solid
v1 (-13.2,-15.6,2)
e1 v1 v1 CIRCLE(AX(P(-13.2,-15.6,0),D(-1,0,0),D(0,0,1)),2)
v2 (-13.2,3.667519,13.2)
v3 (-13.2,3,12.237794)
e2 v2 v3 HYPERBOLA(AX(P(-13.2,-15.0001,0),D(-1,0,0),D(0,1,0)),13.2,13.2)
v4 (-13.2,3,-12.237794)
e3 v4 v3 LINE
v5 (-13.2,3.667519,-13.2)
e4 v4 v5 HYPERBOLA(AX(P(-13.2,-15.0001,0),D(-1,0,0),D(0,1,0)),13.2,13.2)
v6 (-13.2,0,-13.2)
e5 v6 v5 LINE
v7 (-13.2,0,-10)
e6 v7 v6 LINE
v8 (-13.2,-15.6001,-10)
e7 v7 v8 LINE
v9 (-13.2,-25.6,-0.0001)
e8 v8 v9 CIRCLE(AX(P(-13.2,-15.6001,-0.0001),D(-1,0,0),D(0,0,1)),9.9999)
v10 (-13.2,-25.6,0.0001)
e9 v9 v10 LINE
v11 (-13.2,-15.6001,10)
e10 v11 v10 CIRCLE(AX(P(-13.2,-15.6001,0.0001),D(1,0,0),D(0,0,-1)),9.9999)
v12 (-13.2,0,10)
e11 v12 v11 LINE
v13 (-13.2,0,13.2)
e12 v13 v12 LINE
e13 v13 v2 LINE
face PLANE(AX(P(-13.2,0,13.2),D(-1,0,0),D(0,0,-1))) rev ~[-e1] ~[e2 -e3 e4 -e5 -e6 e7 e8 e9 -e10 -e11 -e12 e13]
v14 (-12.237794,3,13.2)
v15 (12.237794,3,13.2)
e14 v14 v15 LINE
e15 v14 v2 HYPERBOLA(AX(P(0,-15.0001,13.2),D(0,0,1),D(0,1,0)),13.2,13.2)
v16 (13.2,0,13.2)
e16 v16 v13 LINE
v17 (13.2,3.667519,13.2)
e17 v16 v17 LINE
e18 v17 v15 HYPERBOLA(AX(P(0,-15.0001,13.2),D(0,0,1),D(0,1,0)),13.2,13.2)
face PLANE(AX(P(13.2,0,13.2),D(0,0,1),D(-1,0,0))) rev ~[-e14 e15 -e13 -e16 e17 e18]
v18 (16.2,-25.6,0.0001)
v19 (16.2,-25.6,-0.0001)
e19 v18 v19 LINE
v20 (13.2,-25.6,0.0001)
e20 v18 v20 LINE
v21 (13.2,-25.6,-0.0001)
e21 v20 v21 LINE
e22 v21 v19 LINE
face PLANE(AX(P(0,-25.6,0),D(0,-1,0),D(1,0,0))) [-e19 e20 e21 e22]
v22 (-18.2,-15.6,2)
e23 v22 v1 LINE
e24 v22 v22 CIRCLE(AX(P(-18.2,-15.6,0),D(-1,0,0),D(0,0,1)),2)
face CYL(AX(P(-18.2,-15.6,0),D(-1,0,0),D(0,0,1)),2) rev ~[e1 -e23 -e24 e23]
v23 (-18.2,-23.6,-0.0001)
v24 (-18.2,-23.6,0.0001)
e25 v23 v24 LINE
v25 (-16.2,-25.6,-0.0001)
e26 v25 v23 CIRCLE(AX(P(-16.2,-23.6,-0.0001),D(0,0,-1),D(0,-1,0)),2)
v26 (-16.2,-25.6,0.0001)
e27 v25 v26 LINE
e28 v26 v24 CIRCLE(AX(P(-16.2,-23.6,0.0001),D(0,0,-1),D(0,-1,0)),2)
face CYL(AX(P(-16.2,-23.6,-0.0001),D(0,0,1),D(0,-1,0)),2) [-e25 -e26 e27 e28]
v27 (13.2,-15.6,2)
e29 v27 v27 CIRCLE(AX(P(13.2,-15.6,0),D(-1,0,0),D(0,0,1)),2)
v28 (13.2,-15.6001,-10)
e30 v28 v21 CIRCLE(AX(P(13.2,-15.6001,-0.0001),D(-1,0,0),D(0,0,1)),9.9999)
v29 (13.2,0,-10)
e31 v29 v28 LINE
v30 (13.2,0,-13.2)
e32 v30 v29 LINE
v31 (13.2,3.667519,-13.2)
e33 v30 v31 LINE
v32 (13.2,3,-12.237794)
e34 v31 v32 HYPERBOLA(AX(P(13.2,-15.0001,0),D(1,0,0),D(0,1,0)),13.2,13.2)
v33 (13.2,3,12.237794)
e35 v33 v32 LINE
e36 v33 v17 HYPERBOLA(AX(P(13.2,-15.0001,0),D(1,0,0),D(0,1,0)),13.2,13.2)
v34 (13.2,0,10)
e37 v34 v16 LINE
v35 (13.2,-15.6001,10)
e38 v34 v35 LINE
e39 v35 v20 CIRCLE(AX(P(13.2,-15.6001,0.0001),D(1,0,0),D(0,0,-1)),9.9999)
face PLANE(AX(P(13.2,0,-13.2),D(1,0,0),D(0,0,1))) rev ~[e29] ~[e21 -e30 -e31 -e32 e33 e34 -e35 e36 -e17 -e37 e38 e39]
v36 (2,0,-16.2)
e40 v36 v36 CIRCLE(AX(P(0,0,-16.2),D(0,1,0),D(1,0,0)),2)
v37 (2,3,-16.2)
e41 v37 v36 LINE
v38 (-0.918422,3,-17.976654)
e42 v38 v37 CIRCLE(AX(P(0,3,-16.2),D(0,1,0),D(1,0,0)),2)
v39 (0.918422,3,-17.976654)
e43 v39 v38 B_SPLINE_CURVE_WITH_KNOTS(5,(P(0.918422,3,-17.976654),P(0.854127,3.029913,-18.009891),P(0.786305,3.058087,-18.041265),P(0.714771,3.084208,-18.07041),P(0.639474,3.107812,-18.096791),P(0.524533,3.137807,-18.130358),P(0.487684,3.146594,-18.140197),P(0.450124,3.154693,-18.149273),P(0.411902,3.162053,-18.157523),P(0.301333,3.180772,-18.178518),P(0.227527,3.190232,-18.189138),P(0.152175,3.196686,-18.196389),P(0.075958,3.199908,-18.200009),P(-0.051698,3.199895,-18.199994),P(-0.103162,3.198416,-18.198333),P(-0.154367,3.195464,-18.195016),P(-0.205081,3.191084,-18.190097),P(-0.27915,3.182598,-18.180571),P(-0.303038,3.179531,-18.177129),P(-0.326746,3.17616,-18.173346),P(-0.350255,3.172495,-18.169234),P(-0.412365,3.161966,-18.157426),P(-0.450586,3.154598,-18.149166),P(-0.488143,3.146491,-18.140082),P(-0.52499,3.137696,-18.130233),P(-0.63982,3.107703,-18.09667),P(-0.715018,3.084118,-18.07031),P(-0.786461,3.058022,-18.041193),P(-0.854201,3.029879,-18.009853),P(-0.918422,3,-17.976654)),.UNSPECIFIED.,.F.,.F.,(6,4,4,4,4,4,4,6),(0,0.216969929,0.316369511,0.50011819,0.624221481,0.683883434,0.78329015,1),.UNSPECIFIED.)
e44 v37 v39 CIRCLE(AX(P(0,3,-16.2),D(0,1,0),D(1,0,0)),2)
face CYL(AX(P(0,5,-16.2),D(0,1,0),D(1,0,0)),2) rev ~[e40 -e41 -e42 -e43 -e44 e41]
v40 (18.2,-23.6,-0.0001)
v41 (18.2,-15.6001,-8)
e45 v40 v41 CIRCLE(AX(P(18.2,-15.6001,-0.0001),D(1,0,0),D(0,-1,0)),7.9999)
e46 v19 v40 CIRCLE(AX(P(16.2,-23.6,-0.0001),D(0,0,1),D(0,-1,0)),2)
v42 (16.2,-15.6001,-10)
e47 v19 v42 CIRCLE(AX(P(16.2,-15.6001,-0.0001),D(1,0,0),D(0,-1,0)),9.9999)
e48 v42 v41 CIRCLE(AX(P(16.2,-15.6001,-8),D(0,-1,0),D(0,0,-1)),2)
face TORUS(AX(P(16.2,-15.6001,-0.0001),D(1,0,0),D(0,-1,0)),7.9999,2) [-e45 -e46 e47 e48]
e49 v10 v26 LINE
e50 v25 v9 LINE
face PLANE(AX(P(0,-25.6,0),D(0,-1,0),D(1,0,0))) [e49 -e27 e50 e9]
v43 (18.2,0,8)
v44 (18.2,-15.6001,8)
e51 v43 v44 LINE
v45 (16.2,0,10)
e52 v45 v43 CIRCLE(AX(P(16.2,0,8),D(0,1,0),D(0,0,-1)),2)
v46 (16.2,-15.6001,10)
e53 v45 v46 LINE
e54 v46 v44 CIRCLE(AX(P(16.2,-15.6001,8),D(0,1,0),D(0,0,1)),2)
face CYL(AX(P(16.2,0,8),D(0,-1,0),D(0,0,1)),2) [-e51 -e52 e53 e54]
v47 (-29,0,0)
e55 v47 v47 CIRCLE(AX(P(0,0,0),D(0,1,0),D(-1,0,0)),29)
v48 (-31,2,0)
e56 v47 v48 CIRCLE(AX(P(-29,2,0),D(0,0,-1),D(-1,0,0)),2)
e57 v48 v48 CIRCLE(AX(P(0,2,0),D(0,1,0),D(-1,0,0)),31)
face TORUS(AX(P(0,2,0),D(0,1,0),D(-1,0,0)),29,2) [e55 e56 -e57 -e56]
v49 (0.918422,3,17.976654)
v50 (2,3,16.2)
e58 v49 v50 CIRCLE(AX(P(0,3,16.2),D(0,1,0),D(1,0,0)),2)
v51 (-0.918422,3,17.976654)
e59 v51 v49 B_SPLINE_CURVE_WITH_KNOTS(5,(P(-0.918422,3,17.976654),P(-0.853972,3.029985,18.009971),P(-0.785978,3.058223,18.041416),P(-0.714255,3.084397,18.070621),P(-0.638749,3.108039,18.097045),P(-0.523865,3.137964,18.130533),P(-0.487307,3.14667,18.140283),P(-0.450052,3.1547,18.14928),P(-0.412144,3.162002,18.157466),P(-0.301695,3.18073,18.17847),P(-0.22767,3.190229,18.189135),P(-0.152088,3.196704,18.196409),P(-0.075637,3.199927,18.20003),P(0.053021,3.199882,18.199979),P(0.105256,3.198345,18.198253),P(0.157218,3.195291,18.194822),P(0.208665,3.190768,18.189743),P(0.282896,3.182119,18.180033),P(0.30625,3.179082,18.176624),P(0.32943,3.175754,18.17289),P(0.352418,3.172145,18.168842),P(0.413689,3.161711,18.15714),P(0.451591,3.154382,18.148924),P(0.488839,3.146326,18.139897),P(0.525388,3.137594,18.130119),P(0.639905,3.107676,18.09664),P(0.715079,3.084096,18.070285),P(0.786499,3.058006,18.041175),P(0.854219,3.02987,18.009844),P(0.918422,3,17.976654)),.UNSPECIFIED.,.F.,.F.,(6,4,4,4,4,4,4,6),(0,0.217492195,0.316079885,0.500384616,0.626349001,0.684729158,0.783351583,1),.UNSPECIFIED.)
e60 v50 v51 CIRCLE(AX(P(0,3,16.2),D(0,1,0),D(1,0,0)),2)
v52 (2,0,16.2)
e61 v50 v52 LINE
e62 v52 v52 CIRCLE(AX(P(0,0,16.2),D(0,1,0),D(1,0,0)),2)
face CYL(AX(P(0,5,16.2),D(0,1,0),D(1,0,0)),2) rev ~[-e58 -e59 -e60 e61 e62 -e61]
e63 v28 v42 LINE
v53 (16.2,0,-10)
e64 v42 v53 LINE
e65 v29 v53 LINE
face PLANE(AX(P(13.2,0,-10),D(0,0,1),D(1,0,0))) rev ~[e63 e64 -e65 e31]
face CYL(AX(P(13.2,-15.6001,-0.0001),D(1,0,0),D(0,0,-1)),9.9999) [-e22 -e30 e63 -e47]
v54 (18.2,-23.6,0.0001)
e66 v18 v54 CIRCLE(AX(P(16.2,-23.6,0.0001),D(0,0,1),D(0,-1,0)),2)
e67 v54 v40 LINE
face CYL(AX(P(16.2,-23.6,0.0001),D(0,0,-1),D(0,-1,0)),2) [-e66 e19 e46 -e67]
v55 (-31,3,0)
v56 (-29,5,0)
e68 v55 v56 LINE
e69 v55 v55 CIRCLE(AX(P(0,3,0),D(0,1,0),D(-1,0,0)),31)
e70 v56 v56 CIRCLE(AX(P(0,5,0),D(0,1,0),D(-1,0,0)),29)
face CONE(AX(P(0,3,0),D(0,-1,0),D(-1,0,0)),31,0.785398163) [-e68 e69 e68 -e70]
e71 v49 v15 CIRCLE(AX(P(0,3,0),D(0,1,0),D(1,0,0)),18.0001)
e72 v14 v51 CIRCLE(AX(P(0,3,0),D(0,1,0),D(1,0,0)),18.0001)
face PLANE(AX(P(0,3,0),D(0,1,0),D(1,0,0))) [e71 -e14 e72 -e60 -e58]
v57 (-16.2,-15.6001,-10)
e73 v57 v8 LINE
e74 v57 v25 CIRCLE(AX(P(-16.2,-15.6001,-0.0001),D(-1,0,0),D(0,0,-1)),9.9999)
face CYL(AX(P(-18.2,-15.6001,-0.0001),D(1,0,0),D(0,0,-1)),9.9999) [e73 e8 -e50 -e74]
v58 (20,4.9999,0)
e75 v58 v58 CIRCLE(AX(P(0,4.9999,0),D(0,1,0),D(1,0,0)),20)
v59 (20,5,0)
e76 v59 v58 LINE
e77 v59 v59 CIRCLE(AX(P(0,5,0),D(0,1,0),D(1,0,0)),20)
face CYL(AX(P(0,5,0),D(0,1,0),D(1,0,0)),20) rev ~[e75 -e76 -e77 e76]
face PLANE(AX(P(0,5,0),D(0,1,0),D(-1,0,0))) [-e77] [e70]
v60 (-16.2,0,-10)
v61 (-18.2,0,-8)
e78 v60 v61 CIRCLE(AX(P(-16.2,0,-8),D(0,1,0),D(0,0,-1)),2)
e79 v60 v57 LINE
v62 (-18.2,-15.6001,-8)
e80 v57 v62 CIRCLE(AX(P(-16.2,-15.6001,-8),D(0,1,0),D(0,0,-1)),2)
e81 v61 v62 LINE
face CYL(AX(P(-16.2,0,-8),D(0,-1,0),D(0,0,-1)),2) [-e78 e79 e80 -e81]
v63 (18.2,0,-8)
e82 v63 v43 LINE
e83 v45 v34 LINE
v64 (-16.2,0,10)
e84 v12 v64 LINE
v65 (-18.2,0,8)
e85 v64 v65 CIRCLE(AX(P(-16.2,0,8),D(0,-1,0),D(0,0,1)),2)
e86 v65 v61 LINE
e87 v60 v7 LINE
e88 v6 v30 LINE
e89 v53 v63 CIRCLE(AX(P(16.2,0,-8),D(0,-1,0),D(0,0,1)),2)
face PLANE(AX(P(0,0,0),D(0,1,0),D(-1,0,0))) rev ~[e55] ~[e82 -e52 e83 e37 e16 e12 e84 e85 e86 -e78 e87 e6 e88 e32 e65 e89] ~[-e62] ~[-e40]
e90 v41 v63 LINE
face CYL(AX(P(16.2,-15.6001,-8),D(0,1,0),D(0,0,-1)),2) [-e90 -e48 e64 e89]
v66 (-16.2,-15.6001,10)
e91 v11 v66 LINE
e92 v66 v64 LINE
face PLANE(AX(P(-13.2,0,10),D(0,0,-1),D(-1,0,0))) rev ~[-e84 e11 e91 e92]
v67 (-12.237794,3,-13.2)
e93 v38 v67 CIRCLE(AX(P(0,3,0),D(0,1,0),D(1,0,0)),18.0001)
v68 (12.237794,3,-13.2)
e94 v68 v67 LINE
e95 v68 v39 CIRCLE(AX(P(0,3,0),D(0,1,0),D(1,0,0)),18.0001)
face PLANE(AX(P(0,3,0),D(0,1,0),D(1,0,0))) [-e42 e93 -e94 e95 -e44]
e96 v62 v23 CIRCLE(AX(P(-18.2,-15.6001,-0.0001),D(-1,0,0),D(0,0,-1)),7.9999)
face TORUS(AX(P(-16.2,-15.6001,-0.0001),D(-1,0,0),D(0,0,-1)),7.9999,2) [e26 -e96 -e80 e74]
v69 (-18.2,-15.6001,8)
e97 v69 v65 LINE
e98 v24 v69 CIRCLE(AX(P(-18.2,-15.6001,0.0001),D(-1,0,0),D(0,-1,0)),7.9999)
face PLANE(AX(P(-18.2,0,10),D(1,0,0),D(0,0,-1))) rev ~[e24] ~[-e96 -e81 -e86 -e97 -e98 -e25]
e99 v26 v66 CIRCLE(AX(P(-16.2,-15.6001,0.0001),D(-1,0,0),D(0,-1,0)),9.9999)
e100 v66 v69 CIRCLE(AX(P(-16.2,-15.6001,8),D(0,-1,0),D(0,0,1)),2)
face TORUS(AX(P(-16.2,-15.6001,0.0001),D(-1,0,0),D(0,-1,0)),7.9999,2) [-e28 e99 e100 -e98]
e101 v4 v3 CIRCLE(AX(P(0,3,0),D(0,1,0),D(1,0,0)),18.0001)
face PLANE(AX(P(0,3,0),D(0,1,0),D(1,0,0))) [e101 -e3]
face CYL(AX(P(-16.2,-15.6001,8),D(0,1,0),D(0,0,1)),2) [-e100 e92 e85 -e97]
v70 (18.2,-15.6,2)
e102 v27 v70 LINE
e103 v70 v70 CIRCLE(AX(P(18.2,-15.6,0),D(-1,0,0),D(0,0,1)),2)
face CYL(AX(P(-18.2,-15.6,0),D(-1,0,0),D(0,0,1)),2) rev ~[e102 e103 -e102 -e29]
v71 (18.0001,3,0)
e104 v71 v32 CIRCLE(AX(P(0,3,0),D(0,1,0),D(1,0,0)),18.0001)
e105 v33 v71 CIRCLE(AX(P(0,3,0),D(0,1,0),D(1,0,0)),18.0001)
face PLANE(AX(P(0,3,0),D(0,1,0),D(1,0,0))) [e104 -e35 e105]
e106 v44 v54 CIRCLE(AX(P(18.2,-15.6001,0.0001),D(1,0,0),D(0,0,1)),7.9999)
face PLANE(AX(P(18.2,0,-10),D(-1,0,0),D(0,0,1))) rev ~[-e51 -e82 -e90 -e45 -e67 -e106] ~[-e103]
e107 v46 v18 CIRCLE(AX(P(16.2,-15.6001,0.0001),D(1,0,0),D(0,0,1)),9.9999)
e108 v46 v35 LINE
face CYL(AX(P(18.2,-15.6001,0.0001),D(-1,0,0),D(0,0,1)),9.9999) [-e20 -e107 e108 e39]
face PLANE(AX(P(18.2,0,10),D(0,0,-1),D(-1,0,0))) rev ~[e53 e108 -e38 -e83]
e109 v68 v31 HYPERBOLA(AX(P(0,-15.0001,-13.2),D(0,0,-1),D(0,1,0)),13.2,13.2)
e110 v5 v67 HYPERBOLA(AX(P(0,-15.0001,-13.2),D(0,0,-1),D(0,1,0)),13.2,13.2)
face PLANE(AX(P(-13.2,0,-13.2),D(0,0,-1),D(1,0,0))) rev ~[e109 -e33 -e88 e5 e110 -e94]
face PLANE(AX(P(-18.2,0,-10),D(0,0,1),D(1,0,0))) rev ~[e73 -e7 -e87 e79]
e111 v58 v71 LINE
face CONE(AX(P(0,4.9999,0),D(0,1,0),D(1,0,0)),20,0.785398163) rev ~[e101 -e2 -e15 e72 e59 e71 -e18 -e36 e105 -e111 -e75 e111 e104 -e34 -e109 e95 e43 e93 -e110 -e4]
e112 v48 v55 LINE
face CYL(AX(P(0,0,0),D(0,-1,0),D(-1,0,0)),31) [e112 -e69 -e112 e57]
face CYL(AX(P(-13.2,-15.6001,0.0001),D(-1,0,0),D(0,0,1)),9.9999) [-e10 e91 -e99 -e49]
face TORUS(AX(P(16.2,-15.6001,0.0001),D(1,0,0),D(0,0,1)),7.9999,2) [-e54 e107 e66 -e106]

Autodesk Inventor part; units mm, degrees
ref_plane "YZ Plane" through (0, 0, 0) normal (1, 0, 0) x (0, 1, 0)
ref_plane "XZ Plane" through (0, 0, 0) normal (0, 1, 0) x (-1, 0, 0)
ref_plane "XY Plane" through (0, 0, 0) normal (0, 0, 1) x (1, 0, 0)
sketch "Sketch1" plane through (0, 0, 0) normal (0, 1, 0) x (-1, 0, 0)
  circle A0 centre (0, 0) radius 31
  dimension "d0" = 62
extrude "Extrusion1" add sketch "Sketch1" along normal blind 5
sketch "Sketch2" plane through (0, 5, 0) normal (0, 1, 0) x (1, 0, 0)
  circle A0 centre (0, 0) radius 20
  dimension "d3" = 40
extrude "Extrusion2" cut sketch "Sketch2" against normal blind 2
chamfer "Chamfer1" distance 2 angle 45 1 edges at (-20, 3, 0)
sketch "Sketch3" plane through (0, 0, 0) normal (0, -1, 0) x (1, 0, 0)
  line L0 (13.2, 13.2) -> (-13.2, 13.2)
  line L1 (-13.2, 13.2) -> (-13.2, -13.2)
  line L2 (-13.2, -13.2) -> (13.2, -13.2)
  line L3 (13.2, -13.2) -> (13.2, 13.2)
  point P0 (0, 0)
  dimension "d9" = 26.4
  dimension "d10" = 26.4
extrude "Extrusion3" cut sketch "Sketch3" against normal blind 6
sketch "Sketch4" plane through (0, 5, 0) normal (0, 1, 0) x (1, 0, 0)
  circle A0 centre (0, 16.2) radius 2
  circle A1 centre (0, -16.2) radius 2
  point P0 (0, 0)
  dimension "d13" = 4
  dimension "d14" = 4
extrude "Extrusion4" cut sketch "Sketch4" against normal blind 6
sketch "Sketch5" plane through (0, 0, 0) normal (0, -1, 0) x (1, 0, 0)
  line L0 (-13.2, -13.2) -> (-13.2, 13.2) projected
  line L1 (-13.2, 10) -> (-18.2, 10)
  line L2 (-18.2, 10) -> (-18.2, -10)
  line L3 (-18.2, -10) -> (-13.2, -10)
  line L4 (-13.2, -10) -> (-13.2, 10)
  line L5 (13.2, 13.2) -> (13.2, -13.2) projected
  line L6 (13.2, -10) -> (18.2, -10)
  line L7 (18.2, -10) -> (18.2, 10)
  line L8 (18.2, 10) -> (13.2, 10)
  line L9 (13.2, 10) -> (13.2, -10)
  point P0 (0, 0)
  dimension "d17" = 5
  dimension "d18" = 20
  dimension "d19" = 5
  dimension "d20" = 20
extrude "Extrusion5" add sketch "Sketch5" along normal blind 25.6
fillet "Fillet1" radius 10 4 edges at (15.7, -25.6, 10) (15.7, -25.6, -10) (-15.7, -25.6, -10) (-15.7, -25.6, 10)
fillet "Fillet2" radius 2 7 edges at (31, 0, 0) (18.2, -7.8001, 10) (18.2, -7.8001, -10) (18.2, -22.6711, 7.0711) (-18.2, -7.8001, -10) (-18.2, -7.8001, 10) (-18.2, -22.6711, -7.0711)
sketch "Sketch6" plane through (-18.2, 0, -8) normal (-1, 0, 0) x (0, 0, 1)
  circle A0 centre (8, -15.6) radius 2
  line L0 (0, 0) -> (16, 0) projected
  point P0 (8, 0)
  dimension "d25" = 4
  dimension "d31" = 15.6
extrude "Extrusion6" cut sketch "Sketch6" against normal blind 50
chamfer "Chamfer2" distance 2 angle 45 1 edges at (31, 5, 0)
properties part number "bigSpringMountB"
